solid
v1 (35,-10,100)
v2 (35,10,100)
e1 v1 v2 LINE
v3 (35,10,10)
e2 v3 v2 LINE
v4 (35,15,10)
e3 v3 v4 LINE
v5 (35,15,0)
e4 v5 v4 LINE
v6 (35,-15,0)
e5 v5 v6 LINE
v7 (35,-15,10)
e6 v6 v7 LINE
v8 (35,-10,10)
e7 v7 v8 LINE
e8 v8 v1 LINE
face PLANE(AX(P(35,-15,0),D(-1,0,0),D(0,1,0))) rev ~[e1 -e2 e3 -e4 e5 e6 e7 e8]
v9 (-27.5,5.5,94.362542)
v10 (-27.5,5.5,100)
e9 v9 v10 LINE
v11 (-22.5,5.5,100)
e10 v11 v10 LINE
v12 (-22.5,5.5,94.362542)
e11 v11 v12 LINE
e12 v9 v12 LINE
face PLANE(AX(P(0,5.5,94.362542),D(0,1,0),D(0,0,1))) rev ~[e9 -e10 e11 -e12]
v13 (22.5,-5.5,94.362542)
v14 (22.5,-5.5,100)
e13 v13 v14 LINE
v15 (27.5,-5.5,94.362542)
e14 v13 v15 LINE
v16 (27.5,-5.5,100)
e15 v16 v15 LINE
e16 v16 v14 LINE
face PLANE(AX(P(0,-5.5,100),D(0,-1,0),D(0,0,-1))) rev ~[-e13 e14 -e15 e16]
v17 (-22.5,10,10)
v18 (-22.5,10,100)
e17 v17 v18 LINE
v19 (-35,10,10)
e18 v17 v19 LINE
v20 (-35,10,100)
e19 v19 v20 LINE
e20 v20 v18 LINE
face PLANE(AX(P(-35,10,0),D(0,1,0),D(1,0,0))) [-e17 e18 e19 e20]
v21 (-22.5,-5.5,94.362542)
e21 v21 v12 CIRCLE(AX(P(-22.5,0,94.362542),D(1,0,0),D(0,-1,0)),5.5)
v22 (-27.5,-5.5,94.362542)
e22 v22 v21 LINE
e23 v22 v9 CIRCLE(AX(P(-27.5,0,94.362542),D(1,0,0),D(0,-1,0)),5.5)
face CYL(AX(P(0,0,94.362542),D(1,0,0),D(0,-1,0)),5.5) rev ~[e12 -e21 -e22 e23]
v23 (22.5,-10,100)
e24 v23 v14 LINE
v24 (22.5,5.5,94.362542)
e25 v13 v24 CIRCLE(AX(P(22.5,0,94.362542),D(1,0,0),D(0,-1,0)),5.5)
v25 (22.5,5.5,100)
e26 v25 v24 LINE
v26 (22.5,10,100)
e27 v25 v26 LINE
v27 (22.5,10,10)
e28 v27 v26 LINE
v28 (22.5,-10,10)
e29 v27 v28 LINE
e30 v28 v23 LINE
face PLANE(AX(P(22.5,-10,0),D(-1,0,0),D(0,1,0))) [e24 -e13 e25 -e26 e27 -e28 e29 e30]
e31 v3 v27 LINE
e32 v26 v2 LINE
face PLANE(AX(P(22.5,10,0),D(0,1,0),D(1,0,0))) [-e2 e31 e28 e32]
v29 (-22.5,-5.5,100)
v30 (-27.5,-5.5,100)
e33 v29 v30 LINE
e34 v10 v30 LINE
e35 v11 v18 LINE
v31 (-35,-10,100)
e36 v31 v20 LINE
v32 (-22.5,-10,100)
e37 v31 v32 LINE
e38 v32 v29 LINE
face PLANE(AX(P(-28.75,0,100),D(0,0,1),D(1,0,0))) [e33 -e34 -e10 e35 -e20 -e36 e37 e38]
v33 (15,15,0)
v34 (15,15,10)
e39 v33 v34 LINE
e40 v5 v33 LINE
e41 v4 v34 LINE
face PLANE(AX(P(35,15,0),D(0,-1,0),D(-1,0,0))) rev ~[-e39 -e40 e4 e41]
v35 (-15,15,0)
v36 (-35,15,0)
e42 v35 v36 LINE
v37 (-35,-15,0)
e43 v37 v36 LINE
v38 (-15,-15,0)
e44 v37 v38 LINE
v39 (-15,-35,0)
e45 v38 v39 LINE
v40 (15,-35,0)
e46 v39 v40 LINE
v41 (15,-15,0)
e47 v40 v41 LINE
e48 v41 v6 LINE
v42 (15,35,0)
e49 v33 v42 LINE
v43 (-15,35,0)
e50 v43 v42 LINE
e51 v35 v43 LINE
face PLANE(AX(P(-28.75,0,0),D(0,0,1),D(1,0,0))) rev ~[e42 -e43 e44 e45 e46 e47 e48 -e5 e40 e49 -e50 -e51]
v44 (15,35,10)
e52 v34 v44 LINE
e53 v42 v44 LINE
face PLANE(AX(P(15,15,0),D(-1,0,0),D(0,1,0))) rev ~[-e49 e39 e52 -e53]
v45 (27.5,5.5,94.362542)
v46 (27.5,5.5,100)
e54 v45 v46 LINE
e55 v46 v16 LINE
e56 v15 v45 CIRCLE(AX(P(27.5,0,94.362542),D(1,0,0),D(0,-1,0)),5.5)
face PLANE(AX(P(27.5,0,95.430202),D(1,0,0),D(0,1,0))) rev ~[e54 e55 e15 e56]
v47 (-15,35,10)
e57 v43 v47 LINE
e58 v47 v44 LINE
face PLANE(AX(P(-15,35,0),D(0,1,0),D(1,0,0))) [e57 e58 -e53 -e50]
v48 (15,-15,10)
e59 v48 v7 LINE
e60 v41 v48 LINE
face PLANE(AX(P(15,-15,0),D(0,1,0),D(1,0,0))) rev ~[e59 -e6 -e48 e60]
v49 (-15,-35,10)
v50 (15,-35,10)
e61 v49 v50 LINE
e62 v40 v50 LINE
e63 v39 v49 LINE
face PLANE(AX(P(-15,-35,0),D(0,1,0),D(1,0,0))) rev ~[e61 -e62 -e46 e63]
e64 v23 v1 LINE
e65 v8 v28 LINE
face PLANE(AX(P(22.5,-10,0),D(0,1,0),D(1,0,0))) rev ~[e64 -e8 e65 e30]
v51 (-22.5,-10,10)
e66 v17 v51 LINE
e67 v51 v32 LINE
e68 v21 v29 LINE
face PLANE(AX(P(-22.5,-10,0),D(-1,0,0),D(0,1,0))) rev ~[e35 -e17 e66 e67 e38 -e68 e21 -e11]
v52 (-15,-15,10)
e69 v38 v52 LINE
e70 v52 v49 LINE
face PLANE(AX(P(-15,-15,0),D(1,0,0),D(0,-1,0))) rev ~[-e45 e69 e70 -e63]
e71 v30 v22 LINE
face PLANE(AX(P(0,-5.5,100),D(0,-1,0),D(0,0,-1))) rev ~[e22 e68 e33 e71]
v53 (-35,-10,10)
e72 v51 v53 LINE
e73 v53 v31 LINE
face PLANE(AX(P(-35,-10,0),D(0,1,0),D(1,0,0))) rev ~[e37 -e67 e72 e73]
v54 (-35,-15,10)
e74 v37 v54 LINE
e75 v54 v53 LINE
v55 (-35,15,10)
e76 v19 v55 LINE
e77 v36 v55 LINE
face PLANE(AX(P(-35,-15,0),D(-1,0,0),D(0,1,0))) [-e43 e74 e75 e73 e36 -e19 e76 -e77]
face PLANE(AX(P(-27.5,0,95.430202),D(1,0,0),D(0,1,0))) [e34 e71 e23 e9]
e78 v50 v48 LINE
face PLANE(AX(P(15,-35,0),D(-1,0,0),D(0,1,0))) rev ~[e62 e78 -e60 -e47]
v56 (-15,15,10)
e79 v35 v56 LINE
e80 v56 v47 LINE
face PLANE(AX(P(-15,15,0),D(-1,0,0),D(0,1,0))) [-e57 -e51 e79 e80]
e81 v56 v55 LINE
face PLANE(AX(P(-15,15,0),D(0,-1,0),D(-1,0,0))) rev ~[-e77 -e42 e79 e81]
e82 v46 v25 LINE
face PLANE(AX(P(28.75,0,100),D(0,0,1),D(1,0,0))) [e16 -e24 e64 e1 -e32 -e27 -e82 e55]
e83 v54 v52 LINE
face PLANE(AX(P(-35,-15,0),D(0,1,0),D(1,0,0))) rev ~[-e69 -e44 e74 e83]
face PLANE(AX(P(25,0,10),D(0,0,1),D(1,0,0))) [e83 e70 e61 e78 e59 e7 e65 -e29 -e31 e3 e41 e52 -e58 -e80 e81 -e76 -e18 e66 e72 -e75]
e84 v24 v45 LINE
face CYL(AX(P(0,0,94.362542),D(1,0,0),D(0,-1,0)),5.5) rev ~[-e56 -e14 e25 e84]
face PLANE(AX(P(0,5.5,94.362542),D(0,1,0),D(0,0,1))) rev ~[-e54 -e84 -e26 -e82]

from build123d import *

# Parameters (mm, degrees)
F0_W     = 20
F0_H     = 30
F0_W_2   = 30
F0_H_2   = 20
F1_DEPTH = 10
F2_W     = 12.5
F2_H     = 20
F3_DEPTH = 100
F5_DEPTH = 27.5


with BuildPart() as f1:
    # F0 (on Top) → F1 (new body)
    with BuildSketch(Plane.XY):
        with Locations((25, 0)):
            Rectangle(F0_W, F0_H)
        with Locations((0, -25)):
            Rectangle(F0_W_2, F0_H_2)
        Rectangle(F0_W_2, F0_H)
        with Locations((-25, 0)):
            Rectangle(F0_W, F0_H)
        with Locations((0, 25)):
            Rectangle(F0_W_2, F0_H_2)
    extrude(amount=F1_DEPTH)

    # F2 (on Top) → F3 (join)
    with BuildSketch(Plane.XY):
        with Locations((-28.75, 0)):
            Rectangle(F2_W, F2_H)
        with Locations((28.75, 0)):
            Rectangle(F2_W, F2_H)
    extrude(amount=F3_DEPTH)

    # F4 (on Right) → F5 (cut, symmetric)
    with BuildSketch(Plane.YZ):
        with BuildLine():
            Line((-5.5, 100), (-5.5, 94.3625420332))
            ThreePointArc((-5.5, 94.3625420332), (0, 88.8625420332), (5.5, 94.3625420332))
            Line((5.5, 94.3625420332), (5.5, 100))
            Line((5.5, 100), (-5.5, 100))
        make_face()
    extrude(amount=F5_DEPTH, both=True, mode=Mode.SUBTRACT)


solid = f1.part
